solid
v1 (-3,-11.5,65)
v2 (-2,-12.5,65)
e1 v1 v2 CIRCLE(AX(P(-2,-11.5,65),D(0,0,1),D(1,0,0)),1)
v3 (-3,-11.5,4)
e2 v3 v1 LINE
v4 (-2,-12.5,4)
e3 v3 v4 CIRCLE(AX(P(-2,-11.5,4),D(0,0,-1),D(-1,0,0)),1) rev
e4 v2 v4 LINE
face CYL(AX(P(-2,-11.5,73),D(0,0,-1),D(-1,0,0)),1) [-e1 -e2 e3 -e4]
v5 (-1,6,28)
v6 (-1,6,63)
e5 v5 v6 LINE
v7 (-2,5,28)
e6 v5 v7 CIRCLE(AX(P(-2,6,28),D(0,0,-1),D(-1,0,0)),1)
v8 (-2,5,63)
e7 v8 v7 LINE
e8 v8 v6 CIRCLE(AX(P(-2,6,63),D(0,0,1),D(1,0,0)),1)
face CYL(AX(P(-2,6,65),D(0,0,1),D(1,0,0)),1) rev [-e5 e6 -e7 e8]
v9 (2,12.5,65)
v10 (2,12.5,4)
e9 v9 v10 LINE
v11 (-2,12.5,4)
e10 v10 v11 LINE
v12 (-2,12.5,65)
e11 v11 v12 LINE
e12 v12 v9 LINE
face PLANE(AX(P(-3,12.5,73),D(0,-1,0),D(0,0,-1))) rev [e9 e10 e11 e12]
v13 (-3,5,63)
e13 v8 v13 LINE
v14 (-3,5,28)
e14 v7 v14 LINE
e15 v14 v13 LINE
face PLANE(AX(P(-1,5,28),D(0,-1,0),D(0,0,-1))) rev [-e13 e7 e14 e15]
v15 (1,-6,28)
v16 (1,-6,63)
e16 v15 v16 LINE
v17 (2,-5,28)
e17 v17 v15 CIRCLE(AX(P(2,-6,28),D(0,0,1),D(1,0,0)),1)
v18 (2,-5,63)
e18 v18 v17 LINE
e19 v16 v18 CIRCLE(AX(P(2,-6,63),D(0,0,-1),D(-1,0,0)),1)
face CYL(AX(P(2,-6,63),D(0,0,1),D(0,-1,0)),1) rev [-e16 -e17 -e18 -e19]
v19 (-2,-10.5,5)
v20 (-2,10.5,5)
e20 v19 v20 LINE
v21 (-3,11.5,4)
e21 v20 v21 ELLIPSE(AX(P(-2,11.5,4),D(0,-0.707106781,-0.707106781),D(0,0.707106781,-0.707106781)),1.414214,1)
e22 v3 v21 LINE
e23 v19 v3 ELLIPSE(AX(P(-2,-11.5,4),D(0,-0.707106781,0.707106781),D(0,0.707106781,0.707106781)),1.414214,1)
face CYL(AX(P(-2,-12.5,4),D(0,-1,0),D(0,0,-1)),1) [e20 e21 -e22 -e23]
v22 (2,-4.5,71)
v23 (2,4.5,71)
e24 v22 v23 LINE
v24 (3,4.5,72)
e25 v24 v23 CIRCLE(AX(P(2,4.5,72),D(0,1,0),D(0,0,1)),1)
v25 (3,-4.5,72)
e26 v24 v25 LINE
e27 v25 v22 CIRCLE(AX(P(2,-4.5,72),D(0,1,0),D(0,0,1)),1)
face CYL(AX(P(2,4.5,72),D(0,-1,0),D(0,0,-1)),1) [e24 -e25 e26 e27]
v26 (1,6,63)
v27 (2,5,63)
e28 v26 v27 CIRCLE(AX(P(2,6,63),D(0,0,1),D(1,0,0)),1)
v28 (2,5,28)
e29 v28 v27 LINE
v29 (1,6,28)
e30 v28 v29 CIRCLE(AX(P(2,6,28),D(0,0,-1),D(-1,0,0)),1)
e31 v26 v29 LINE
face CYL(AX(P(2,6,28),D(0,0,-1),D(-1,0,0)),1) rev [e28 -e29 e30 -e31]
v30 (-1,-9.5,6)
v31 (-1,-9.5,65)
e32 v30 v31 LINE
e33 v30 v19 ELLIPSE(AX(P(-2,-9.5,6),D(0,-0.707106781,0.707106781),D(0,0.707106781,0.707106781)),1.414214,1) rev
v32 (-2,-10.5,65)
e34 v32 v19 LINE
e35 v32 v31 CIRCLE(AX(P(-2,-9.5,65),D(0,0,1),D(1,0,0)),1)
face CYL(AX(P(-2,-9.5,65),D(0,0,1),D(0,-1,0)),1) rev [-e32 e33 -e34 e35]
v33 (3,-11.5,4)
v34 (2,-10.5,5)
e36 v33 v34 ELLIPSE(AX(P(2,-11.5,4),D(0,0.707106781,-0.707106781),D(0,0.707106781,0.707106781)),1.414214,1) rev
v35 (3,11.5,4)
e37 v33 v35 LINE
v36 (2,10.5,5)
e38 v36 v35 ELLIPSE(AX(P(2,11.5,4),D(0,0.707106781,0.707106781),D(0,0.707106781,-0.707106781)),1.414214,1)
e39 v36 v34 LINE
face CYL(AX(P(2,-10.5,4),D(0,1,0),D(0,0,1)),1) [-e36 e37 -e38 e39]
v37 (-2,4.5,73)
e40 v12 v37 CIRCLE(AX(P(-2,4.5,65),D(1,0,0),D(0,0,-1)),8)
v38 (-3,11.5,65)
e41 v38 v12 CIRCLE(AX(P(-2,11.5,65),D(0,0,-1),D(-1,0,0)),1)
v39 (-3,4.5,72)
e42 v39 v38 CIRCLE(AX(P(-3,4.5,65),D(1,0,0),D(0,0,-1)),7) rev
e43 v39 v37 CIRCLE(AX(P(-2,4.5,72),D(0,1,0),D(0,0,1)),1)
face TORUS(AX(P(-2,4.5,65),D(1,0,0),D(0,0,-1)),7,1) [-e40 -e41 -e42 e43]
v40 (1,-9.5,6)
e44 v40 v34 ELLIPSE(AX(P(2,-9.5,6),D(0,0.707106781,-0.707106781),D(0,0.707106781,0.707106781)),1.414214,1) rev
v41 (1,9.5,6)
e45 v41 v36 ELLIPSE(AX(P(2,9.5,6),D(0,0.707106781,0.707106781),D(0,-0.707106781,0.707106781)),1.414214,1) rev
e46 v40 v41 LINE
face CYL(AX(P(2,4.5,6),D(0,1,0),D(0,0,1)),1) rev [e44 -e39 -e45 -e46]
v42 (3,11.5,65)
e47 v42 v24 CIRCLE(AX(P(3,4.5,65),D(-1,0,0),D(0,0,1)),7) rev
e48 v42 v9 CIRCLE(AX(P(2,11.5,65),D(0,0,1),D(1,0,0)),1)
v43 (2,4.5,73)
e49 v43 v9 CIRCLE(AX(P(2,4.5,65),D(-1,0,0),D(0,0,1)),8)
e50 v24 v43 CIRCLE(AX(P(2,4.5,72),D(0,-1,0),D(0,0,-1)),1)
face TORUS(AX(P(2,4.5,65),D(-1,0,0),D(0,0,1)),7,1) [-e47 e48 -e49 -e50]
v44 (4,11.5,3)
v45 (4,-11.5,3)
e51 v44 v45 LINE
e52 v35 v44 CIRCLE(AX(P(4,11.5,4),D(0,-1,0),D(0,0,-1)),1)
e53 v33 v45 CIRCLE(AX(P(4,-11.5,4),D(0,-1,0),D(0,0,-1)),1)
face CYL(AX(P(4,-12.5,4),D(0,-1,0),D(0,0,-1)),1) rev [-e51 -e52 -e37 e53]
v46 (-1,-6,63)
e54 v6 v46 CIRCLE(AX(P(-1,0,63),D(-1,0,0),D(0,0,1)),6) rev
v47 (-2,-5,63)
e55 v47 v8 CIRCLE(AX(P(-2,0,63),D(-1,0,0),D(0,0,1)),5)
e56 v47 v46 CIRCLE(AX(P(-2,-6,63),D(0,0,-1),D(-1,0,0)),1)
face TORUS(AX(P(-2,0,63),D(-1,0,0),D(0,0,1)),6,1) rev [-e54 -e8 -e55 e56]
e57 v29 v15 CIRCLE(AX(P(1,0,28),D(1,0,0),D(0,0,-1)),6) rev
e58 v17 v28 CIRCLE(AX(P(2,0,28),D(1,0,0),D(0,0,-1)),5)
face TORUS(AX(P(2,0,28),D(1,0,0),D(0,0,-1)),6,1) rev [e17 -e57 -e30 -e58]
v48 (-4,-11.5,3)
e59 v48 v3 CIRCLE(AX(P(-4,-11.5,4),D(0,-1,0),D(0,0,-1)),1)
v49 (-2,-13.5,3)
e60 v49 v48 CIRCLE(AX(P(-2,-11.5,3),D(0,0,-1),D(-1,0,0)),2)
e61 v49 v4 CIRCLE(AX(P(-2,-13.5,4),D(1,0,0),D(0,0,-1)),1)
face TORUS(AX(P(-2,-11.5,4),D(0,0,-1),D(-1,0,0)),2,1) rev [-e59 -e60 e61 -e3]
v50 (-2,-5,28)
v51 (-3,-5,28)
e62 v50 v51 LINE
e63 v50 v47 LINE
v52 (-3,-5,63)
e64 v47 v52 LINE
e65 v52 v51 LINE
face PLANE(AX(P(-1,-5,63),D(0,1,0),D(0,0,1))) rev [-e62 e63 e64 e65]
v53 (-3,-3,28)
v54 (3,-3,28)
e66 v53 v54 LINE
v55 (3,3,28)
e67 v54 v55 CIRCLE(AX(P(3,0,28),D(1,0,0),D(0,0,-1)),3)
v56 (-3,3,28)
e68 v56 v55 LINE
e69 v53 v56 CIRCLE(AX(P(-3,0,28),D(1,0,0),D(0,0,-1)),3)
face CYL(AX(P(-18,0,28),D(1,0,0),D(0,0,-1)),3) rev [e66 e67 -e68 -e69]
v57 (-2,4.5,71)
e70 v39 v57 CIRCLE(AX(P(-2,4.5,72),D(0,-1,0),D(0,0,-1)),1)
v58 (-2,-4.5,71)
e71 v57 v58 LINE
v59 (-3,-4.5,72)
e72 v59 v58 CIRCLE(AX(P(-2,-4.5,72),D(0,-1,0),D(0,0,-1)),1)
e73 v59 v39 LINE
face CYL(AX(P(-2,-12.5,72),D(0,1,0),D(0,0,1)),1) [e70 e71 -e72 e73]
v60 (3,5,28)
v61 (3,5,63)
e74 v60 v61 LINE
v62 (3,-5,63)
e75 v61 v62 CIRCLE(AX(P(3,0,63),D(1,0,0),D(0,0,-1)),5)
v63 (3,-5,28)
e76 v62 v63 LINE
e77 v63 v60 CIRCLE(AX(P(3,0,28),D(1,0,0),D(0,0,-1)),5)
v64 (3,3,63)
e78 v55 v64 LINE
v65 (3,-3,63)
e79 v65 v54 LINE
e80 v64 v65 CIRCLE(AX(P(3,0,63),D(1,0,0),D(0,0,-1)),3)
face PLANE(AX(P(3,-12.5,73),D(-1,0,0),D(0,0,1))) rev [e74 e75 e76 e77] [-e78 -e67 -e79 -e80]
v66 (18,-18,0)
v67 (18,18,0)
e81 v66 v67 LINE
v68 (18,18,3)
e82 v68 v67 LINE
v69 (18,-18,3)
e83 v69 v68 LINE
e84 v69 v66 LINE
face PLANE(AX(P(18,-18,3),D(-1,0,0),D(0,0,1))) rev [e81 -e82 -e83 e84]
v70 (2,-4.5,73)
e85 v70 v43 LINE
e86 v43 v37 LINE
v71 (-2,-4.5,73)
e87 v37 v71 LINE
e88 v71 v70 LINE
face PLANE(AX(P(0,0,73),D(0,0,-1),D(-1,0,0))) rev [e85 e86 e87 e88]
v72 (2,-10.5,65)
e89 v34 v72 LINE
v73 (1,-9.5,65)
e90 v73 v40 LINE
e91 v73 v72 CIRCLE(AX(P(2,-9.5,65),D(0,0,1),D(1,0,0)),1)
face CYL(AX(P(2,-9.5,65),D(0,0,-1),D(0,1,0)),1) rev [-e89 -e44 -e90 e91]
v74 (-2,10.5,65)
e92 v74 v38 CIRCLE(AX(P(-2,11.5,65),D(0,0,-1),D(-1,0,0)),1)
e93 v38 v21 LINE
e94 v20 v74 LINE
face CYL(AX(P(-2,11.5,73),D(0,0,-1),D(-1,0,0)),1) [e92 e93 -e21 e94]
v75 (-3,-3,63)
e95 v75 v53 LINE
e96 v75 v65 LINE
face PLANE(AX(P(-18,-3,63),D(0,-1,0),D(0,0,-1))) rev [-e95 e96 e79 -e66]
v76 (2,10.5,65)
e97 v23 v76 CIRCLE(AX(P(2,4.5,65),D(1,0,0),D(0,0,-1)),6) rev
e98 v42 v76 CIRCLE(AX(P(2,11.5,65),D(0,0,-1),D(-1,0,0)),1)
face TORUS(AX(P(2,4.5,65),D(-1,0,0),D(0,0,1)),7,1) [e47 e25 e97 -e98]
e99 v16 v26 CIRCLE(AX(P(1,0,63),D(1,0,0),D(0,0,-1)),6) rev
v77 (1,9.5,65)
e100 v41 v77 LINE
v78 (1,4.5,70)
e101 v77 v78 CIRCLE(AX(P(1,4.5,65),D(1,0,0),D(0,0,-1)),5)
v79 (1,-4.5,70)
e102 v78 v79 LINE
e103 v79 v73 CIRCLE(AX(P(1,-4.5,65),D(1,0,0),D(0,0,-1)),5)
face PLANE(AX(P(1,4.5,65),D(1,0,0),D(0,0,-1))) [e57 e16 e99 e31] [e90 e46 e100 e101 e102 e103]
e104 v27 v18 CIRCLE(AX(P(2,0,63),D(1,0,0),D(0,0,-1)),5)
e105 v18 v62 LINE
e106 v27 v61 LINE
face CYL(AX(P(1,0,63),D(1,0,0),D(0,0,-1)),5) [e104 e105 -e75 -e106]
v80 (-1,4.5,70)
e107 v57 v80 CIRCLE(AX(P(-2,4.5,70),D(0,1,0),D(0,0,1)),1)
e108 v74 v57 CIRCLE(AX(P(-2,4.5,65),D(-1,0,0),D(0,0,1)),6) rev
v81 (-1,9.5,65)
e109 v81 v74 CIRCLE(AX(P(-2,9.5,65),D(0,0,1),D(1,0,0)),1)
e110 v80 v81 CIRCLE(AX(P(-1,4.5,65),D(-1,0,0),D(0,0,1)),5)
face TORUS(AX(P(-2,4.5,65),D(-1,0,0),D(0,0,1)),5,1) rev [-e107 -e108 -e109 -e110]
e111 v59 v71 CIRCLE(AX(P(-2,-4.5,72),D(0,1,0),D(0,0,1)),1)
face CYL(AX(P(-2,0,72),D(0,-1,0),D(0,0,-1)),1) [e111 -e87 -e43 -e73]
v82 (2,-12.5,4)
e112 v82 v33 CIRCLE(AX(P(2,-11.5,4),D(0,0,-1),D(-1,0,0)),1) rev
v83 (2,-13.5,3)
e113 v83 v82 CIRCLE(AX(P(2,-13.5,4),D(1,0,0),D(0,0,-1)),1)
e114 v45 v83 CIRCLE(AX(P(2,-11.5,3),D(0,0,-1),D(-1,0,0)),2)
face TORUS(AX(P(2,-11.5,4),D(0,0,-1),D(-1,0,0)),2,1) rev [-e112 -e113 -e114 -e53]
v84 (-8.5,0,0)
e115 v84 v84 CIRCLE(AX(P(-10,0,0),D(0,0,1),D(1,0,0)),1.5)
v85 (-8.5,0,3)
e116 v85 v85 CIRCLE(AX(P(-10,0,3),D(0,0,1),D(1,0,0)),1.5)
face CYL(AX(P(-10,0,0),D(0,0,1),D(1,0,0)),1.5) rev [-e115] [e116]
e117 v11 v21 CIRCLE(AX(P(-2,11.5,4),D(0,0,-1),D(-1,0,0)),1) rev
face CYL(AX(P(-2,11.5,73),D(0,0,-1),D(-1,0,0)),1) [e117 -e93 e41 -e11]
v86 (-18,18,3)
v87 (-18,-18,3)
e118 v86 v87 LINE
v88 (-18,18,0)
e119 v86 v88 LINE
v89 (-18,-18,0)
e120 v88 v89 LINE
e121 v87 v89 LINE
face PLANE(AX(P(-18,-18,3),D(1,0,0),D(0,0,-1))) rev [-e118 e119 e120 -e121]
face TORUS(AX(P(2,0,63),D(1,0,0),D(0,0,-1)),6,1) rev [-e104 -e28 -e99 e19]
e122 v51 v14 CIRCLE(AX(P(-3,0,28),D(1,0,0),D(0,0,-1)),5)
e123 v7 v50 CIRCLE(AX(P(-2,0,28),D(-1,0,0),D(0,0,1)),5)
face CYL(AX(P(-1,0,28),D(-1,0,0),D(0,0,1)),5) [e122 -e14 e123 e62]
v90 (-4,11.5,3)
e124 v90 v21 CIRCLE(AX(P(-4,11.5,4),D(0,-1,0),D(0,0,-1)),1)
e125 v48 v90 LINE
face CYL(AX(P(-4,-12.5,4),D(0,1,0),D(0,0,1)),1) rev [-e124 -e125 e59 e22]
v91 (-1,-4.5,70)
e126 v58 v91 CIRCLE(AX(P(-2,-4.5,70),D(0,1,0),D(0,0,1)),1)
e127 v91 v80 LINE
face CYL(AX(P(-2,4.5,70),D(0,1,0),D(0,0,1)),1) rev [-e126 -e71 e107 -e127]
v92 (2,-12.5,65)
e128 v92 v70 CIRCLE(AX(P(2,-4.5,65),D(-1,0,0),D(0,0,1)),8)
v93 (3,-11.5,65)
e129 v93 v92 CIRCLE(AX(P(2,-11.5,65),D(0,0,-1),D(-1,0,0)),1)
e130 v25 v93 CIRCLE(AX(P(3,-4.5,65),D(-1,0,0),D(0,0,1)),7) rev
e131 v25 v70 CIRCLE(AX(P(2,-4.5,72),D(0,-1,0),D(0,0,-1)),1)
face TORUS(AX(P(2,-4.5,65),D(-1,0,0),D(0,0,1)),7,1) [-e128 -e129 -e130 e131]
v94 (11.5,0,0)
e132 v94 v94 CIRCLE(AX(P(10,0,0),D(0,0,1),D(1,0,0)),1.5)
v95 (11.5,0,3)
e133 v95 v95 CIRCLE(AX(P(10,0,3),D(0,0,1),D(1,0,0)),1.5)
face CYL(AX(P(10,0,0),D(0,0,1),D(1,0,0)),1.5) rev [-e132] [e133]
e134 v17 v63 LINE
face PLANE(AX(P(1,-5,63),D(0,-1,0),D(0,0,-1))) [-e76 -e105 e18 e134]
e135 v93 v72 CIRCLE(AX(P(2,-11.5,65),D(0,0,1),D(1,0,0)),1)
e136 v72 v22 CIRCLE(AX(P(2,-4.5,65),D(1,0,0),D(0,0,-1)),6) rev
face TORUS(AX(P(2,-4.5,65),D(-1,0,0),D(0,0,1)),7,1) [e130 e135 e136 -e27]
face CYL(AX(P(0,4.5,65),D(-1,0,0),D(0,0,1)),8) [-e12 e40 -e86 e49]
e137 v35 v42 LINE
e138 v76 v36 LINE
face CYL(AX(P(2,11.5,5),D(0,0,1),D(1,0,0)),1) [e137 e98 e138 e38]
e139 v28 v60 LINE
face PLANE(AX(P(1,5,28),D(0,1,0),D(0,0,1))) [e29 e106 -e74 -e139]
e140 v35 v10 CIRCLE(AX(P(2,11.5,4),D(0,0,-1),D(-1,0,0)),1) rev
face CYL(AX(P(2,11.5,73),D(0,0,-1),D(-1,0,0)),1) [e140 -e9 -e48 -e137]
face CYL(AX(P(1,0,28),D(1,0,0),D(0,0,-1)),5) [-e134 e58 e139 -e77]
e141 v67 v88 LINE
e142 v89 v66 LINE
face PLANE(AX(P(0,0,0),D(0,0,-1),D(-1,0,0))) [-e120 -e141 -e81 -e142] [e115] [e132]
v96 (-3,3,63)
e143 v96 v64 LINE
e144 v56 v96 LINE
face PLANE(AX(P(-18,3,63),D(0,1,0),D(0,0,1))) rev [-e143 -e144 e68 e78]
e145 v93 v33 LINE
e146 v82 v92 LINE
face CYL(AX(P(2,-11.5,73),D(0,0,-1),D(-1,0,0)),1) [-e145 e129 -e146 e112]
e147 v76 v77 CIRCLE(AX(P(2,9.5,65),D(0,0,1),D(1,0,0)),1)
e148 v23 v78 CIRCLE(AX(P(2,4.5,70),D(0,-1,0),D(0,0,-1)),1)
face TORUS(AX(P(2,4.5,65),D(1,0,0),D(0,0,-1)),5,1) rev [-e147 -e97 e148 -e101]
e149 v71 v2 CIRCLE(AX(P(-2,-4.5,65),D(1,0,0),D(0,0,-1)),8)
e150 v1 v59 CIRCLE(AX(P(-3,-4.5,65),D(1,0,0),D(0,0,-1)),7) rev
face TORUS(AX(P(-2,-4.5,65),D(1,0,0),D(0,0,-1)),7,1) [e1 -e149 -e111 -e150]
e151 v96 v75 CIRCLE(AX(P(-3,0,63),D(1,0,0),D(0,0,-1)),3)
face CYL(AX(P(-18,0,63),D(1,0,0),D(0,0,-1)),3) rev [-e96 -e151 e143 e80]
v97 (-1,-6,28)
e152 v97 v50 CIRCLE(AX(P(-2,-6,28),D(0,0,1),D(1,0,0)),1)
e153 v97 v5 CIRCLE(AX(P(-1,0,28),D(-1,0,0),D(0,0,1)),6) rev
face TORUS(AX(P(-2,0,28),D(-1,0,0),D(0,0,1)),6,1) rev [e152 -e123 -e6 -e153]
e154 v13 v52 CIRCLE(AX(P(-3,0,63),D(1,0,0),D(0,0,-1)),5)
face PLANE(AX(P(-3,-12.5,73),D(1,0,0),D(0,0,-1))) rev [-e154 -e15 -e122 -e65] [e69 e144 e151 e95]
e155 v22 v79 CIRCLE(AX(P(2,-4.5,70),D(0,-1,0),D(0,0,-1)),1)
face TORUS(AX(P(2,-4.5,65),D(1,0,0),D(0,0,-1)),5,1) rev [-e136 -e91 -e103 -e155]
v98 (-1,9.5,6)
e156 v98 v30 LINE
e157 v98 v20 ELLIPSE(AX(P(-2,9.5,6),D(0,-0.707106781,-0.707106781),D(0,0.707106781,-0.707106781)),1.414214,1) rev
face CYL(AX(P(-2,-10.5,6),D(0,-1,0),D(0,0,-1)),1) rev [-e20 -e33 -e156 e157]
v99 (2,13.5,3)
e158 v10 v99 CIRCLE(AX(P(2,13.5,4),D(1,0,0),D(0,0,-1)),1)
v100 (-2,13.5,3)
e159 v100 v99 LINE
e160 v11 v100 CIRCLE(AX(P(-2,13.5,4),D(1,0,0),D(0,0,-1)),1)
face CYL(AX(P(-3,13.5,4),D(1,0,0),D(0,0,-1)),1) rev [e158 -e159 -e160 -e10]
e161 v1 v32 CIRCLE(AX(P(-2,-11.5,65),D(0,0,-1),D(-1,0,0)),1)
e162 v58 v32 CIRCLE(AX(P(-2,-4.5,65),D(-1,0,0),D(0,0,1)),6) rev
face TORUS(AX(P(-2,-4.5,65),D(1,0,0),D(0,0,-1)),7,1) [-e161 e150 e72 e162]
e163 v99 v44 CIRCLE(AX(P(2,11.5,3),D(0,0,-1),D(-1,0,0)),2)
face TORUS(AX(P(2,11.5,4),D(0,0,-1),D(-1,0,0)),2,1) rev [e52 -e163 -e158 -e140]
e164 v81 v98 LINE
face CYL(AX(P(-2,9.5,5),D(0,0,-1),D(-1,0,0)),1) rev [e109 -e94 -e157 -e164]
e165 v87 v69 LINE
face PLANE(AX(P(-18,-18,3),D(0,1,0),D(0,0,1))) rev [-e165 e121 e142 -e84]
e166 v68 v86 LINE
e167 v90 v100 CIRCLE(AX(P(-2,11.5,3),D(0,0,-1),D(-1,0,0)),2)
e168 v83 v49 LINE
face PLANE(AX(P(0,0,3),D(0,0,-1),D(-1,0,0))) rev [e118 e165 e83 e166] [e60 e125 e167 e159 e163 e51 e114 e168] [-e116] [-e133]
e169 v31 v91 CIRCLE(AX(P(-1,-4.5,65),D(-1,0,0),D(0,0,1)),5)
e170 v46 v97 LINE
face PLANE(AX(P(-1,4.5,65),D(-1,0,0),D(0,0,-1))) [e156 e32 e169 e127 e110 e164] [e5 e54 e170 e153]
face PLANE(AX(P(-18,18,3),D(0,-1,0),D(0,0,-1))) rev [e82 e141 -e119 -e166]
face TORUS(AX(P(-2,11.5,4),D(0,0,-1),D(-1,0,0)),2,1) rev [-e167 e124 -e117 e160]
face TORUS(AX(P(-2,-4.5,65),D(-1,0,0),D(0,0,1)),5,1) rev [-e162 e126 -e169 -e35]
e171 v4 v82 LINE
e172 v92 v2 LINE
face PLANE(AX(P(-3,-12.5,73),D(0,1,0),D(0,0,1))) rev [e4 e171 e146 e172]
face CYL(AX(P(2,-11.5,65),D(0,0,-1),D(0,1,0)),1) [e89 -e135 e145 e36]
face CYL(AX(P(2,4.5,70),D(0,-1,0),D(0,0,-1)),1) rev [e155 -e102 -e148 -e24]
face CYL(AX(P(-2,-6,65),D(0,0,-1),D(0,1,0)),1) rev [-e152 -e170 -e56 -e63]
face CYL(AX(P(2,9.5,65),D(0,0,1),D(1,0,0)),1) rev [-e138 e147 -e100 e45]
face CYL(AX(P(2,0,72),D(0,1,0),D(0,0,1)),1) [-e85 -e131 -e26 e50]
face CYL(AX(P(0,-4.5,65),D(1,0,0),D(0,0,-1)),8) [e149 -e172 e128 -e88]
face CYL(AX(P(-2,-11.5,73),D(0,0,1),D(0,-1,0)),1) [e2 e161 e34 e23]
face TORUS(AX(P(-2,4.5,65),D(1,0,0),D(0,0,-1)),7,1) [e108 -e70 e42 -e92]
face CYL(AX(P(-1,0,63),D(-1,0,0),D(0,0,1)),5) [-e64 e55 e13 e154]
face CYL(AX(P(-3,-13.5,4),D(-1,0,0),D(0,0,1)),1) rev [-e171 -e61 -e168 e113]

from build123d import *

# Parameters (mm, degrees)
SKETCH1_W           = 36
SKETCH1_H           = 36
BOSS_EXTRUDE1_DEPTH = 3
SKETCH2_R           = 1.5
CUT_EXTRUDE1_DEPTH  = 26.632011236
SKETCH3_W           = 6
SKETCH3_H           = 25
BOSS_EXTRUDE2_DEPTH = 70
CUT_EXTRUDE2_DEPTH  = 79.064076245
FILLET1_R           = 8
CUT_EXTRUDE3_DEPTH  = 2
FILLET2_R           = 1
FILLET3_R           = 1
FILLET4_R           = 1
FILLET6_R           = 1
FILLET5_R           = 1
FILLET9_R           = 1


with BuildPart() as part:
    # Sketch1 → Boss-Extrude1 (new body)
    with BuildSketch(Plane.XY):
        Rectangle(SKETCH1_W, SKETCH1_H)
    extrude(amount=BOSS_EXTRUDE1_DEPTH)

    # Sketch2 → Cut-Extrude1 (cut, through all)
    with BuildSketch(Plane.XY.offset(3)):
        with Locations((-10, 0)):
            Circle(SKETCH2_R)
        with Locations((10, 0)):
            Circle(SKETCH2_R)
    extrude(amount=-CUT_EXTRUDE1_DEPTH, mode=Mode.SUBTRACT)

    # Sketch3 → Boss-Extrude2 (add)
    with BuildSketch(Plane.XY.offset(3)):
        Rectangle(SKETCH3_W, SKETCH3_H)
    extrude(amount=BOSS_EXTRUDE2_DEPTH)

    # Sketch5 → Cut-Extrude2 (cut, through all)
    with BuildSketch(Plane(origin=(3, 0, 0), x_dir=(0, 0, -1), z_dir=(1, 0, 0))):
        with BuildLine():
            Line((-63, 3), (-28, 3))
            ThreePointArc((-28, 3), (-25, 0), (-28, -3))
            Line((-28, -3), (-63, -3))
            ThreePointArc((-63, -3), (-66, 0), (-63, 3))
        make_face()
    extrude(amount=-CUT_EXTRUDE2_DEPTH, mode=Mode.SUBTRACT)

    # Fillet1
    fillet1_edges = [part.edges().sort_by_distance(p)[0] for p in [
        (0, 12.5, 73),
        (0, -12.5, 73),
    ]]
    fillet(fillet1_edges, radius=FILLET1_R)

    # Sketch6 → Cut-Extrude3 (cut)
    with BuildSketch(Plane(origin=(3, 0, 0), x_dir=(0, 0, -1), z_dir=(1, 0, 0))):
        with BuildLine():
            Line((-5, 10.5), (-65, 10.5))
            ThreePointArc((-65, 10.5), (-69.242640687, 8.742640687), (-71, 4.5))
            Line((-71, 4.5), (-71, -4.5))
            ThreePointArc((-71, -4.5), (-69.242640687, -8.742640687), (-65, -10.5))
            Line((-65, -10.5), (-5, -10.5))
            Line((-5, -10.5), (-5, 10.5))
        make_face()
        with BuildLine():
            Line((-28, 5), (-63, 5))
            ThreePointArc((-63, 5), (-68, 0), (-63, -5))
            Line((-63, -5), (-28, -5))
            ThreePointArc((-28, -5), (-23, 0), (-28, 5))
        make_face(mode=Mode.SUBTRACT)
    cut_extrude3 = extrude(amount=-CUT_EXTRUDE3_DEPTH, mode=Mode.SUBTRACT)

    # Mirror1: Cut-Extrude3 across plane
    add(cut_extrude3.mirror(Plane(origin=(0, 0, 0), x_dir=(0, 0, 1), z_dir=(1, 0, 0))), mode=Mode.SUBTRACT)

    # Fillet2
    fillet2_edges = [part.edges().sort_by_distance(p)[0] for p in [
        (-1, 0, 5),
        (-1, 10.5, 35),
        (-1, 8.742640687, 69.242640687),
        (-1, 0, 71),
        (-1, -8.742640687, 69.242640687),
        (-1, -10.5, 35),
        (1, 0, 5),
        (1, -10.5, 35),
        (1, -8.742640687, 69.242640687),
        (1, 0, 71),
        (1, 8.742640687, 69.242640687),
        (1, 10.5, 35),
    ]]
    fillet(fillet2_edges, radius=FILLET2_R)

    # Fillet3
    fillet3_edges = [part.edges().sort_by_distance(p)[0] for p in [
        (-1, 0, 23),
        (-1, 5, 45.5),
        (-1, 0, 68),
        (-1, -5, 45.5),
        (1, -5, 45.5),
        (1, 0, 23),
        (1, 5, 45.5),
        (1, 0, 68),
    ]]
    fillet(fillet3_edges, radius=FILLET3_R)

    # Fillet4
    fillet4_edges = [part.edges().sort_by_distance(p)[0] for p in [
        (3, 0, 73),
        (-3, 0, 73),
        (-3, -12.5, 34),
        (-3, 12.5, 34),
        (-3, -10.156854249, 70.656854249),
        (-3, 10.156854249, 70.656854249),
        (3, 12.5, 34),
        (3, -12.5, 34),
        (3, -10.156854249, 70.656854249),
        (3, 10.156854249, 70.656854249),
    ]]
    fillet(fillet4_edges, radius=FILLET4_R)

    # Fillet6
    fillet6_edges = [part.edges().sort_by_distance(p)[0] for p in [
        (-3, -10.5, 35),
        (-3, -8.742640687, 69.242640687),
        (-3, 0, 71),
        (-3, 8.742640687, 69.242640687),
        (-3, 10.5, 35),
        (-3, 0, 5),
        (3, 10.5, 35),
        (3, 8.742640687, 69.242640687),
        (3, -10.5, 35),
        (3, -8.742640687, 69.242640687),
        (3, 0, 71),
    ]]
    fillet(fillet6_edges, radius=FILLET6_R - 0.0001)  # a hair under: the kernel refuses the full size

    # Fillet5
    fillet5_edges = [part.edges().sort_by_distance(p)[0] for p in [
        (0, 12.5, 3),
        (-2.707106781, 12.207106781, 3),
        (0, -12.5, 3),
        (-2.707106781, -12.207106781, 3),
        (-3, 0, 3),
        (2.707106781, 12.207106781, 3),
        (3, 0, 3),
        (2.707106781, -12.207106781, 3),
    ]]
    fillet(fillet5_edges, radius=FILLET5_R)

    # Fillet9
    fillet9_edges = [part.edges().sort_by_distance(p)[0] for p in [
        (3, 0, 5),
    ]]
    fillet(fillet9_edges, radius=FILLET9_R - 0.0001)  # a hair under: the kernel refuses the full size


solid = part.part
